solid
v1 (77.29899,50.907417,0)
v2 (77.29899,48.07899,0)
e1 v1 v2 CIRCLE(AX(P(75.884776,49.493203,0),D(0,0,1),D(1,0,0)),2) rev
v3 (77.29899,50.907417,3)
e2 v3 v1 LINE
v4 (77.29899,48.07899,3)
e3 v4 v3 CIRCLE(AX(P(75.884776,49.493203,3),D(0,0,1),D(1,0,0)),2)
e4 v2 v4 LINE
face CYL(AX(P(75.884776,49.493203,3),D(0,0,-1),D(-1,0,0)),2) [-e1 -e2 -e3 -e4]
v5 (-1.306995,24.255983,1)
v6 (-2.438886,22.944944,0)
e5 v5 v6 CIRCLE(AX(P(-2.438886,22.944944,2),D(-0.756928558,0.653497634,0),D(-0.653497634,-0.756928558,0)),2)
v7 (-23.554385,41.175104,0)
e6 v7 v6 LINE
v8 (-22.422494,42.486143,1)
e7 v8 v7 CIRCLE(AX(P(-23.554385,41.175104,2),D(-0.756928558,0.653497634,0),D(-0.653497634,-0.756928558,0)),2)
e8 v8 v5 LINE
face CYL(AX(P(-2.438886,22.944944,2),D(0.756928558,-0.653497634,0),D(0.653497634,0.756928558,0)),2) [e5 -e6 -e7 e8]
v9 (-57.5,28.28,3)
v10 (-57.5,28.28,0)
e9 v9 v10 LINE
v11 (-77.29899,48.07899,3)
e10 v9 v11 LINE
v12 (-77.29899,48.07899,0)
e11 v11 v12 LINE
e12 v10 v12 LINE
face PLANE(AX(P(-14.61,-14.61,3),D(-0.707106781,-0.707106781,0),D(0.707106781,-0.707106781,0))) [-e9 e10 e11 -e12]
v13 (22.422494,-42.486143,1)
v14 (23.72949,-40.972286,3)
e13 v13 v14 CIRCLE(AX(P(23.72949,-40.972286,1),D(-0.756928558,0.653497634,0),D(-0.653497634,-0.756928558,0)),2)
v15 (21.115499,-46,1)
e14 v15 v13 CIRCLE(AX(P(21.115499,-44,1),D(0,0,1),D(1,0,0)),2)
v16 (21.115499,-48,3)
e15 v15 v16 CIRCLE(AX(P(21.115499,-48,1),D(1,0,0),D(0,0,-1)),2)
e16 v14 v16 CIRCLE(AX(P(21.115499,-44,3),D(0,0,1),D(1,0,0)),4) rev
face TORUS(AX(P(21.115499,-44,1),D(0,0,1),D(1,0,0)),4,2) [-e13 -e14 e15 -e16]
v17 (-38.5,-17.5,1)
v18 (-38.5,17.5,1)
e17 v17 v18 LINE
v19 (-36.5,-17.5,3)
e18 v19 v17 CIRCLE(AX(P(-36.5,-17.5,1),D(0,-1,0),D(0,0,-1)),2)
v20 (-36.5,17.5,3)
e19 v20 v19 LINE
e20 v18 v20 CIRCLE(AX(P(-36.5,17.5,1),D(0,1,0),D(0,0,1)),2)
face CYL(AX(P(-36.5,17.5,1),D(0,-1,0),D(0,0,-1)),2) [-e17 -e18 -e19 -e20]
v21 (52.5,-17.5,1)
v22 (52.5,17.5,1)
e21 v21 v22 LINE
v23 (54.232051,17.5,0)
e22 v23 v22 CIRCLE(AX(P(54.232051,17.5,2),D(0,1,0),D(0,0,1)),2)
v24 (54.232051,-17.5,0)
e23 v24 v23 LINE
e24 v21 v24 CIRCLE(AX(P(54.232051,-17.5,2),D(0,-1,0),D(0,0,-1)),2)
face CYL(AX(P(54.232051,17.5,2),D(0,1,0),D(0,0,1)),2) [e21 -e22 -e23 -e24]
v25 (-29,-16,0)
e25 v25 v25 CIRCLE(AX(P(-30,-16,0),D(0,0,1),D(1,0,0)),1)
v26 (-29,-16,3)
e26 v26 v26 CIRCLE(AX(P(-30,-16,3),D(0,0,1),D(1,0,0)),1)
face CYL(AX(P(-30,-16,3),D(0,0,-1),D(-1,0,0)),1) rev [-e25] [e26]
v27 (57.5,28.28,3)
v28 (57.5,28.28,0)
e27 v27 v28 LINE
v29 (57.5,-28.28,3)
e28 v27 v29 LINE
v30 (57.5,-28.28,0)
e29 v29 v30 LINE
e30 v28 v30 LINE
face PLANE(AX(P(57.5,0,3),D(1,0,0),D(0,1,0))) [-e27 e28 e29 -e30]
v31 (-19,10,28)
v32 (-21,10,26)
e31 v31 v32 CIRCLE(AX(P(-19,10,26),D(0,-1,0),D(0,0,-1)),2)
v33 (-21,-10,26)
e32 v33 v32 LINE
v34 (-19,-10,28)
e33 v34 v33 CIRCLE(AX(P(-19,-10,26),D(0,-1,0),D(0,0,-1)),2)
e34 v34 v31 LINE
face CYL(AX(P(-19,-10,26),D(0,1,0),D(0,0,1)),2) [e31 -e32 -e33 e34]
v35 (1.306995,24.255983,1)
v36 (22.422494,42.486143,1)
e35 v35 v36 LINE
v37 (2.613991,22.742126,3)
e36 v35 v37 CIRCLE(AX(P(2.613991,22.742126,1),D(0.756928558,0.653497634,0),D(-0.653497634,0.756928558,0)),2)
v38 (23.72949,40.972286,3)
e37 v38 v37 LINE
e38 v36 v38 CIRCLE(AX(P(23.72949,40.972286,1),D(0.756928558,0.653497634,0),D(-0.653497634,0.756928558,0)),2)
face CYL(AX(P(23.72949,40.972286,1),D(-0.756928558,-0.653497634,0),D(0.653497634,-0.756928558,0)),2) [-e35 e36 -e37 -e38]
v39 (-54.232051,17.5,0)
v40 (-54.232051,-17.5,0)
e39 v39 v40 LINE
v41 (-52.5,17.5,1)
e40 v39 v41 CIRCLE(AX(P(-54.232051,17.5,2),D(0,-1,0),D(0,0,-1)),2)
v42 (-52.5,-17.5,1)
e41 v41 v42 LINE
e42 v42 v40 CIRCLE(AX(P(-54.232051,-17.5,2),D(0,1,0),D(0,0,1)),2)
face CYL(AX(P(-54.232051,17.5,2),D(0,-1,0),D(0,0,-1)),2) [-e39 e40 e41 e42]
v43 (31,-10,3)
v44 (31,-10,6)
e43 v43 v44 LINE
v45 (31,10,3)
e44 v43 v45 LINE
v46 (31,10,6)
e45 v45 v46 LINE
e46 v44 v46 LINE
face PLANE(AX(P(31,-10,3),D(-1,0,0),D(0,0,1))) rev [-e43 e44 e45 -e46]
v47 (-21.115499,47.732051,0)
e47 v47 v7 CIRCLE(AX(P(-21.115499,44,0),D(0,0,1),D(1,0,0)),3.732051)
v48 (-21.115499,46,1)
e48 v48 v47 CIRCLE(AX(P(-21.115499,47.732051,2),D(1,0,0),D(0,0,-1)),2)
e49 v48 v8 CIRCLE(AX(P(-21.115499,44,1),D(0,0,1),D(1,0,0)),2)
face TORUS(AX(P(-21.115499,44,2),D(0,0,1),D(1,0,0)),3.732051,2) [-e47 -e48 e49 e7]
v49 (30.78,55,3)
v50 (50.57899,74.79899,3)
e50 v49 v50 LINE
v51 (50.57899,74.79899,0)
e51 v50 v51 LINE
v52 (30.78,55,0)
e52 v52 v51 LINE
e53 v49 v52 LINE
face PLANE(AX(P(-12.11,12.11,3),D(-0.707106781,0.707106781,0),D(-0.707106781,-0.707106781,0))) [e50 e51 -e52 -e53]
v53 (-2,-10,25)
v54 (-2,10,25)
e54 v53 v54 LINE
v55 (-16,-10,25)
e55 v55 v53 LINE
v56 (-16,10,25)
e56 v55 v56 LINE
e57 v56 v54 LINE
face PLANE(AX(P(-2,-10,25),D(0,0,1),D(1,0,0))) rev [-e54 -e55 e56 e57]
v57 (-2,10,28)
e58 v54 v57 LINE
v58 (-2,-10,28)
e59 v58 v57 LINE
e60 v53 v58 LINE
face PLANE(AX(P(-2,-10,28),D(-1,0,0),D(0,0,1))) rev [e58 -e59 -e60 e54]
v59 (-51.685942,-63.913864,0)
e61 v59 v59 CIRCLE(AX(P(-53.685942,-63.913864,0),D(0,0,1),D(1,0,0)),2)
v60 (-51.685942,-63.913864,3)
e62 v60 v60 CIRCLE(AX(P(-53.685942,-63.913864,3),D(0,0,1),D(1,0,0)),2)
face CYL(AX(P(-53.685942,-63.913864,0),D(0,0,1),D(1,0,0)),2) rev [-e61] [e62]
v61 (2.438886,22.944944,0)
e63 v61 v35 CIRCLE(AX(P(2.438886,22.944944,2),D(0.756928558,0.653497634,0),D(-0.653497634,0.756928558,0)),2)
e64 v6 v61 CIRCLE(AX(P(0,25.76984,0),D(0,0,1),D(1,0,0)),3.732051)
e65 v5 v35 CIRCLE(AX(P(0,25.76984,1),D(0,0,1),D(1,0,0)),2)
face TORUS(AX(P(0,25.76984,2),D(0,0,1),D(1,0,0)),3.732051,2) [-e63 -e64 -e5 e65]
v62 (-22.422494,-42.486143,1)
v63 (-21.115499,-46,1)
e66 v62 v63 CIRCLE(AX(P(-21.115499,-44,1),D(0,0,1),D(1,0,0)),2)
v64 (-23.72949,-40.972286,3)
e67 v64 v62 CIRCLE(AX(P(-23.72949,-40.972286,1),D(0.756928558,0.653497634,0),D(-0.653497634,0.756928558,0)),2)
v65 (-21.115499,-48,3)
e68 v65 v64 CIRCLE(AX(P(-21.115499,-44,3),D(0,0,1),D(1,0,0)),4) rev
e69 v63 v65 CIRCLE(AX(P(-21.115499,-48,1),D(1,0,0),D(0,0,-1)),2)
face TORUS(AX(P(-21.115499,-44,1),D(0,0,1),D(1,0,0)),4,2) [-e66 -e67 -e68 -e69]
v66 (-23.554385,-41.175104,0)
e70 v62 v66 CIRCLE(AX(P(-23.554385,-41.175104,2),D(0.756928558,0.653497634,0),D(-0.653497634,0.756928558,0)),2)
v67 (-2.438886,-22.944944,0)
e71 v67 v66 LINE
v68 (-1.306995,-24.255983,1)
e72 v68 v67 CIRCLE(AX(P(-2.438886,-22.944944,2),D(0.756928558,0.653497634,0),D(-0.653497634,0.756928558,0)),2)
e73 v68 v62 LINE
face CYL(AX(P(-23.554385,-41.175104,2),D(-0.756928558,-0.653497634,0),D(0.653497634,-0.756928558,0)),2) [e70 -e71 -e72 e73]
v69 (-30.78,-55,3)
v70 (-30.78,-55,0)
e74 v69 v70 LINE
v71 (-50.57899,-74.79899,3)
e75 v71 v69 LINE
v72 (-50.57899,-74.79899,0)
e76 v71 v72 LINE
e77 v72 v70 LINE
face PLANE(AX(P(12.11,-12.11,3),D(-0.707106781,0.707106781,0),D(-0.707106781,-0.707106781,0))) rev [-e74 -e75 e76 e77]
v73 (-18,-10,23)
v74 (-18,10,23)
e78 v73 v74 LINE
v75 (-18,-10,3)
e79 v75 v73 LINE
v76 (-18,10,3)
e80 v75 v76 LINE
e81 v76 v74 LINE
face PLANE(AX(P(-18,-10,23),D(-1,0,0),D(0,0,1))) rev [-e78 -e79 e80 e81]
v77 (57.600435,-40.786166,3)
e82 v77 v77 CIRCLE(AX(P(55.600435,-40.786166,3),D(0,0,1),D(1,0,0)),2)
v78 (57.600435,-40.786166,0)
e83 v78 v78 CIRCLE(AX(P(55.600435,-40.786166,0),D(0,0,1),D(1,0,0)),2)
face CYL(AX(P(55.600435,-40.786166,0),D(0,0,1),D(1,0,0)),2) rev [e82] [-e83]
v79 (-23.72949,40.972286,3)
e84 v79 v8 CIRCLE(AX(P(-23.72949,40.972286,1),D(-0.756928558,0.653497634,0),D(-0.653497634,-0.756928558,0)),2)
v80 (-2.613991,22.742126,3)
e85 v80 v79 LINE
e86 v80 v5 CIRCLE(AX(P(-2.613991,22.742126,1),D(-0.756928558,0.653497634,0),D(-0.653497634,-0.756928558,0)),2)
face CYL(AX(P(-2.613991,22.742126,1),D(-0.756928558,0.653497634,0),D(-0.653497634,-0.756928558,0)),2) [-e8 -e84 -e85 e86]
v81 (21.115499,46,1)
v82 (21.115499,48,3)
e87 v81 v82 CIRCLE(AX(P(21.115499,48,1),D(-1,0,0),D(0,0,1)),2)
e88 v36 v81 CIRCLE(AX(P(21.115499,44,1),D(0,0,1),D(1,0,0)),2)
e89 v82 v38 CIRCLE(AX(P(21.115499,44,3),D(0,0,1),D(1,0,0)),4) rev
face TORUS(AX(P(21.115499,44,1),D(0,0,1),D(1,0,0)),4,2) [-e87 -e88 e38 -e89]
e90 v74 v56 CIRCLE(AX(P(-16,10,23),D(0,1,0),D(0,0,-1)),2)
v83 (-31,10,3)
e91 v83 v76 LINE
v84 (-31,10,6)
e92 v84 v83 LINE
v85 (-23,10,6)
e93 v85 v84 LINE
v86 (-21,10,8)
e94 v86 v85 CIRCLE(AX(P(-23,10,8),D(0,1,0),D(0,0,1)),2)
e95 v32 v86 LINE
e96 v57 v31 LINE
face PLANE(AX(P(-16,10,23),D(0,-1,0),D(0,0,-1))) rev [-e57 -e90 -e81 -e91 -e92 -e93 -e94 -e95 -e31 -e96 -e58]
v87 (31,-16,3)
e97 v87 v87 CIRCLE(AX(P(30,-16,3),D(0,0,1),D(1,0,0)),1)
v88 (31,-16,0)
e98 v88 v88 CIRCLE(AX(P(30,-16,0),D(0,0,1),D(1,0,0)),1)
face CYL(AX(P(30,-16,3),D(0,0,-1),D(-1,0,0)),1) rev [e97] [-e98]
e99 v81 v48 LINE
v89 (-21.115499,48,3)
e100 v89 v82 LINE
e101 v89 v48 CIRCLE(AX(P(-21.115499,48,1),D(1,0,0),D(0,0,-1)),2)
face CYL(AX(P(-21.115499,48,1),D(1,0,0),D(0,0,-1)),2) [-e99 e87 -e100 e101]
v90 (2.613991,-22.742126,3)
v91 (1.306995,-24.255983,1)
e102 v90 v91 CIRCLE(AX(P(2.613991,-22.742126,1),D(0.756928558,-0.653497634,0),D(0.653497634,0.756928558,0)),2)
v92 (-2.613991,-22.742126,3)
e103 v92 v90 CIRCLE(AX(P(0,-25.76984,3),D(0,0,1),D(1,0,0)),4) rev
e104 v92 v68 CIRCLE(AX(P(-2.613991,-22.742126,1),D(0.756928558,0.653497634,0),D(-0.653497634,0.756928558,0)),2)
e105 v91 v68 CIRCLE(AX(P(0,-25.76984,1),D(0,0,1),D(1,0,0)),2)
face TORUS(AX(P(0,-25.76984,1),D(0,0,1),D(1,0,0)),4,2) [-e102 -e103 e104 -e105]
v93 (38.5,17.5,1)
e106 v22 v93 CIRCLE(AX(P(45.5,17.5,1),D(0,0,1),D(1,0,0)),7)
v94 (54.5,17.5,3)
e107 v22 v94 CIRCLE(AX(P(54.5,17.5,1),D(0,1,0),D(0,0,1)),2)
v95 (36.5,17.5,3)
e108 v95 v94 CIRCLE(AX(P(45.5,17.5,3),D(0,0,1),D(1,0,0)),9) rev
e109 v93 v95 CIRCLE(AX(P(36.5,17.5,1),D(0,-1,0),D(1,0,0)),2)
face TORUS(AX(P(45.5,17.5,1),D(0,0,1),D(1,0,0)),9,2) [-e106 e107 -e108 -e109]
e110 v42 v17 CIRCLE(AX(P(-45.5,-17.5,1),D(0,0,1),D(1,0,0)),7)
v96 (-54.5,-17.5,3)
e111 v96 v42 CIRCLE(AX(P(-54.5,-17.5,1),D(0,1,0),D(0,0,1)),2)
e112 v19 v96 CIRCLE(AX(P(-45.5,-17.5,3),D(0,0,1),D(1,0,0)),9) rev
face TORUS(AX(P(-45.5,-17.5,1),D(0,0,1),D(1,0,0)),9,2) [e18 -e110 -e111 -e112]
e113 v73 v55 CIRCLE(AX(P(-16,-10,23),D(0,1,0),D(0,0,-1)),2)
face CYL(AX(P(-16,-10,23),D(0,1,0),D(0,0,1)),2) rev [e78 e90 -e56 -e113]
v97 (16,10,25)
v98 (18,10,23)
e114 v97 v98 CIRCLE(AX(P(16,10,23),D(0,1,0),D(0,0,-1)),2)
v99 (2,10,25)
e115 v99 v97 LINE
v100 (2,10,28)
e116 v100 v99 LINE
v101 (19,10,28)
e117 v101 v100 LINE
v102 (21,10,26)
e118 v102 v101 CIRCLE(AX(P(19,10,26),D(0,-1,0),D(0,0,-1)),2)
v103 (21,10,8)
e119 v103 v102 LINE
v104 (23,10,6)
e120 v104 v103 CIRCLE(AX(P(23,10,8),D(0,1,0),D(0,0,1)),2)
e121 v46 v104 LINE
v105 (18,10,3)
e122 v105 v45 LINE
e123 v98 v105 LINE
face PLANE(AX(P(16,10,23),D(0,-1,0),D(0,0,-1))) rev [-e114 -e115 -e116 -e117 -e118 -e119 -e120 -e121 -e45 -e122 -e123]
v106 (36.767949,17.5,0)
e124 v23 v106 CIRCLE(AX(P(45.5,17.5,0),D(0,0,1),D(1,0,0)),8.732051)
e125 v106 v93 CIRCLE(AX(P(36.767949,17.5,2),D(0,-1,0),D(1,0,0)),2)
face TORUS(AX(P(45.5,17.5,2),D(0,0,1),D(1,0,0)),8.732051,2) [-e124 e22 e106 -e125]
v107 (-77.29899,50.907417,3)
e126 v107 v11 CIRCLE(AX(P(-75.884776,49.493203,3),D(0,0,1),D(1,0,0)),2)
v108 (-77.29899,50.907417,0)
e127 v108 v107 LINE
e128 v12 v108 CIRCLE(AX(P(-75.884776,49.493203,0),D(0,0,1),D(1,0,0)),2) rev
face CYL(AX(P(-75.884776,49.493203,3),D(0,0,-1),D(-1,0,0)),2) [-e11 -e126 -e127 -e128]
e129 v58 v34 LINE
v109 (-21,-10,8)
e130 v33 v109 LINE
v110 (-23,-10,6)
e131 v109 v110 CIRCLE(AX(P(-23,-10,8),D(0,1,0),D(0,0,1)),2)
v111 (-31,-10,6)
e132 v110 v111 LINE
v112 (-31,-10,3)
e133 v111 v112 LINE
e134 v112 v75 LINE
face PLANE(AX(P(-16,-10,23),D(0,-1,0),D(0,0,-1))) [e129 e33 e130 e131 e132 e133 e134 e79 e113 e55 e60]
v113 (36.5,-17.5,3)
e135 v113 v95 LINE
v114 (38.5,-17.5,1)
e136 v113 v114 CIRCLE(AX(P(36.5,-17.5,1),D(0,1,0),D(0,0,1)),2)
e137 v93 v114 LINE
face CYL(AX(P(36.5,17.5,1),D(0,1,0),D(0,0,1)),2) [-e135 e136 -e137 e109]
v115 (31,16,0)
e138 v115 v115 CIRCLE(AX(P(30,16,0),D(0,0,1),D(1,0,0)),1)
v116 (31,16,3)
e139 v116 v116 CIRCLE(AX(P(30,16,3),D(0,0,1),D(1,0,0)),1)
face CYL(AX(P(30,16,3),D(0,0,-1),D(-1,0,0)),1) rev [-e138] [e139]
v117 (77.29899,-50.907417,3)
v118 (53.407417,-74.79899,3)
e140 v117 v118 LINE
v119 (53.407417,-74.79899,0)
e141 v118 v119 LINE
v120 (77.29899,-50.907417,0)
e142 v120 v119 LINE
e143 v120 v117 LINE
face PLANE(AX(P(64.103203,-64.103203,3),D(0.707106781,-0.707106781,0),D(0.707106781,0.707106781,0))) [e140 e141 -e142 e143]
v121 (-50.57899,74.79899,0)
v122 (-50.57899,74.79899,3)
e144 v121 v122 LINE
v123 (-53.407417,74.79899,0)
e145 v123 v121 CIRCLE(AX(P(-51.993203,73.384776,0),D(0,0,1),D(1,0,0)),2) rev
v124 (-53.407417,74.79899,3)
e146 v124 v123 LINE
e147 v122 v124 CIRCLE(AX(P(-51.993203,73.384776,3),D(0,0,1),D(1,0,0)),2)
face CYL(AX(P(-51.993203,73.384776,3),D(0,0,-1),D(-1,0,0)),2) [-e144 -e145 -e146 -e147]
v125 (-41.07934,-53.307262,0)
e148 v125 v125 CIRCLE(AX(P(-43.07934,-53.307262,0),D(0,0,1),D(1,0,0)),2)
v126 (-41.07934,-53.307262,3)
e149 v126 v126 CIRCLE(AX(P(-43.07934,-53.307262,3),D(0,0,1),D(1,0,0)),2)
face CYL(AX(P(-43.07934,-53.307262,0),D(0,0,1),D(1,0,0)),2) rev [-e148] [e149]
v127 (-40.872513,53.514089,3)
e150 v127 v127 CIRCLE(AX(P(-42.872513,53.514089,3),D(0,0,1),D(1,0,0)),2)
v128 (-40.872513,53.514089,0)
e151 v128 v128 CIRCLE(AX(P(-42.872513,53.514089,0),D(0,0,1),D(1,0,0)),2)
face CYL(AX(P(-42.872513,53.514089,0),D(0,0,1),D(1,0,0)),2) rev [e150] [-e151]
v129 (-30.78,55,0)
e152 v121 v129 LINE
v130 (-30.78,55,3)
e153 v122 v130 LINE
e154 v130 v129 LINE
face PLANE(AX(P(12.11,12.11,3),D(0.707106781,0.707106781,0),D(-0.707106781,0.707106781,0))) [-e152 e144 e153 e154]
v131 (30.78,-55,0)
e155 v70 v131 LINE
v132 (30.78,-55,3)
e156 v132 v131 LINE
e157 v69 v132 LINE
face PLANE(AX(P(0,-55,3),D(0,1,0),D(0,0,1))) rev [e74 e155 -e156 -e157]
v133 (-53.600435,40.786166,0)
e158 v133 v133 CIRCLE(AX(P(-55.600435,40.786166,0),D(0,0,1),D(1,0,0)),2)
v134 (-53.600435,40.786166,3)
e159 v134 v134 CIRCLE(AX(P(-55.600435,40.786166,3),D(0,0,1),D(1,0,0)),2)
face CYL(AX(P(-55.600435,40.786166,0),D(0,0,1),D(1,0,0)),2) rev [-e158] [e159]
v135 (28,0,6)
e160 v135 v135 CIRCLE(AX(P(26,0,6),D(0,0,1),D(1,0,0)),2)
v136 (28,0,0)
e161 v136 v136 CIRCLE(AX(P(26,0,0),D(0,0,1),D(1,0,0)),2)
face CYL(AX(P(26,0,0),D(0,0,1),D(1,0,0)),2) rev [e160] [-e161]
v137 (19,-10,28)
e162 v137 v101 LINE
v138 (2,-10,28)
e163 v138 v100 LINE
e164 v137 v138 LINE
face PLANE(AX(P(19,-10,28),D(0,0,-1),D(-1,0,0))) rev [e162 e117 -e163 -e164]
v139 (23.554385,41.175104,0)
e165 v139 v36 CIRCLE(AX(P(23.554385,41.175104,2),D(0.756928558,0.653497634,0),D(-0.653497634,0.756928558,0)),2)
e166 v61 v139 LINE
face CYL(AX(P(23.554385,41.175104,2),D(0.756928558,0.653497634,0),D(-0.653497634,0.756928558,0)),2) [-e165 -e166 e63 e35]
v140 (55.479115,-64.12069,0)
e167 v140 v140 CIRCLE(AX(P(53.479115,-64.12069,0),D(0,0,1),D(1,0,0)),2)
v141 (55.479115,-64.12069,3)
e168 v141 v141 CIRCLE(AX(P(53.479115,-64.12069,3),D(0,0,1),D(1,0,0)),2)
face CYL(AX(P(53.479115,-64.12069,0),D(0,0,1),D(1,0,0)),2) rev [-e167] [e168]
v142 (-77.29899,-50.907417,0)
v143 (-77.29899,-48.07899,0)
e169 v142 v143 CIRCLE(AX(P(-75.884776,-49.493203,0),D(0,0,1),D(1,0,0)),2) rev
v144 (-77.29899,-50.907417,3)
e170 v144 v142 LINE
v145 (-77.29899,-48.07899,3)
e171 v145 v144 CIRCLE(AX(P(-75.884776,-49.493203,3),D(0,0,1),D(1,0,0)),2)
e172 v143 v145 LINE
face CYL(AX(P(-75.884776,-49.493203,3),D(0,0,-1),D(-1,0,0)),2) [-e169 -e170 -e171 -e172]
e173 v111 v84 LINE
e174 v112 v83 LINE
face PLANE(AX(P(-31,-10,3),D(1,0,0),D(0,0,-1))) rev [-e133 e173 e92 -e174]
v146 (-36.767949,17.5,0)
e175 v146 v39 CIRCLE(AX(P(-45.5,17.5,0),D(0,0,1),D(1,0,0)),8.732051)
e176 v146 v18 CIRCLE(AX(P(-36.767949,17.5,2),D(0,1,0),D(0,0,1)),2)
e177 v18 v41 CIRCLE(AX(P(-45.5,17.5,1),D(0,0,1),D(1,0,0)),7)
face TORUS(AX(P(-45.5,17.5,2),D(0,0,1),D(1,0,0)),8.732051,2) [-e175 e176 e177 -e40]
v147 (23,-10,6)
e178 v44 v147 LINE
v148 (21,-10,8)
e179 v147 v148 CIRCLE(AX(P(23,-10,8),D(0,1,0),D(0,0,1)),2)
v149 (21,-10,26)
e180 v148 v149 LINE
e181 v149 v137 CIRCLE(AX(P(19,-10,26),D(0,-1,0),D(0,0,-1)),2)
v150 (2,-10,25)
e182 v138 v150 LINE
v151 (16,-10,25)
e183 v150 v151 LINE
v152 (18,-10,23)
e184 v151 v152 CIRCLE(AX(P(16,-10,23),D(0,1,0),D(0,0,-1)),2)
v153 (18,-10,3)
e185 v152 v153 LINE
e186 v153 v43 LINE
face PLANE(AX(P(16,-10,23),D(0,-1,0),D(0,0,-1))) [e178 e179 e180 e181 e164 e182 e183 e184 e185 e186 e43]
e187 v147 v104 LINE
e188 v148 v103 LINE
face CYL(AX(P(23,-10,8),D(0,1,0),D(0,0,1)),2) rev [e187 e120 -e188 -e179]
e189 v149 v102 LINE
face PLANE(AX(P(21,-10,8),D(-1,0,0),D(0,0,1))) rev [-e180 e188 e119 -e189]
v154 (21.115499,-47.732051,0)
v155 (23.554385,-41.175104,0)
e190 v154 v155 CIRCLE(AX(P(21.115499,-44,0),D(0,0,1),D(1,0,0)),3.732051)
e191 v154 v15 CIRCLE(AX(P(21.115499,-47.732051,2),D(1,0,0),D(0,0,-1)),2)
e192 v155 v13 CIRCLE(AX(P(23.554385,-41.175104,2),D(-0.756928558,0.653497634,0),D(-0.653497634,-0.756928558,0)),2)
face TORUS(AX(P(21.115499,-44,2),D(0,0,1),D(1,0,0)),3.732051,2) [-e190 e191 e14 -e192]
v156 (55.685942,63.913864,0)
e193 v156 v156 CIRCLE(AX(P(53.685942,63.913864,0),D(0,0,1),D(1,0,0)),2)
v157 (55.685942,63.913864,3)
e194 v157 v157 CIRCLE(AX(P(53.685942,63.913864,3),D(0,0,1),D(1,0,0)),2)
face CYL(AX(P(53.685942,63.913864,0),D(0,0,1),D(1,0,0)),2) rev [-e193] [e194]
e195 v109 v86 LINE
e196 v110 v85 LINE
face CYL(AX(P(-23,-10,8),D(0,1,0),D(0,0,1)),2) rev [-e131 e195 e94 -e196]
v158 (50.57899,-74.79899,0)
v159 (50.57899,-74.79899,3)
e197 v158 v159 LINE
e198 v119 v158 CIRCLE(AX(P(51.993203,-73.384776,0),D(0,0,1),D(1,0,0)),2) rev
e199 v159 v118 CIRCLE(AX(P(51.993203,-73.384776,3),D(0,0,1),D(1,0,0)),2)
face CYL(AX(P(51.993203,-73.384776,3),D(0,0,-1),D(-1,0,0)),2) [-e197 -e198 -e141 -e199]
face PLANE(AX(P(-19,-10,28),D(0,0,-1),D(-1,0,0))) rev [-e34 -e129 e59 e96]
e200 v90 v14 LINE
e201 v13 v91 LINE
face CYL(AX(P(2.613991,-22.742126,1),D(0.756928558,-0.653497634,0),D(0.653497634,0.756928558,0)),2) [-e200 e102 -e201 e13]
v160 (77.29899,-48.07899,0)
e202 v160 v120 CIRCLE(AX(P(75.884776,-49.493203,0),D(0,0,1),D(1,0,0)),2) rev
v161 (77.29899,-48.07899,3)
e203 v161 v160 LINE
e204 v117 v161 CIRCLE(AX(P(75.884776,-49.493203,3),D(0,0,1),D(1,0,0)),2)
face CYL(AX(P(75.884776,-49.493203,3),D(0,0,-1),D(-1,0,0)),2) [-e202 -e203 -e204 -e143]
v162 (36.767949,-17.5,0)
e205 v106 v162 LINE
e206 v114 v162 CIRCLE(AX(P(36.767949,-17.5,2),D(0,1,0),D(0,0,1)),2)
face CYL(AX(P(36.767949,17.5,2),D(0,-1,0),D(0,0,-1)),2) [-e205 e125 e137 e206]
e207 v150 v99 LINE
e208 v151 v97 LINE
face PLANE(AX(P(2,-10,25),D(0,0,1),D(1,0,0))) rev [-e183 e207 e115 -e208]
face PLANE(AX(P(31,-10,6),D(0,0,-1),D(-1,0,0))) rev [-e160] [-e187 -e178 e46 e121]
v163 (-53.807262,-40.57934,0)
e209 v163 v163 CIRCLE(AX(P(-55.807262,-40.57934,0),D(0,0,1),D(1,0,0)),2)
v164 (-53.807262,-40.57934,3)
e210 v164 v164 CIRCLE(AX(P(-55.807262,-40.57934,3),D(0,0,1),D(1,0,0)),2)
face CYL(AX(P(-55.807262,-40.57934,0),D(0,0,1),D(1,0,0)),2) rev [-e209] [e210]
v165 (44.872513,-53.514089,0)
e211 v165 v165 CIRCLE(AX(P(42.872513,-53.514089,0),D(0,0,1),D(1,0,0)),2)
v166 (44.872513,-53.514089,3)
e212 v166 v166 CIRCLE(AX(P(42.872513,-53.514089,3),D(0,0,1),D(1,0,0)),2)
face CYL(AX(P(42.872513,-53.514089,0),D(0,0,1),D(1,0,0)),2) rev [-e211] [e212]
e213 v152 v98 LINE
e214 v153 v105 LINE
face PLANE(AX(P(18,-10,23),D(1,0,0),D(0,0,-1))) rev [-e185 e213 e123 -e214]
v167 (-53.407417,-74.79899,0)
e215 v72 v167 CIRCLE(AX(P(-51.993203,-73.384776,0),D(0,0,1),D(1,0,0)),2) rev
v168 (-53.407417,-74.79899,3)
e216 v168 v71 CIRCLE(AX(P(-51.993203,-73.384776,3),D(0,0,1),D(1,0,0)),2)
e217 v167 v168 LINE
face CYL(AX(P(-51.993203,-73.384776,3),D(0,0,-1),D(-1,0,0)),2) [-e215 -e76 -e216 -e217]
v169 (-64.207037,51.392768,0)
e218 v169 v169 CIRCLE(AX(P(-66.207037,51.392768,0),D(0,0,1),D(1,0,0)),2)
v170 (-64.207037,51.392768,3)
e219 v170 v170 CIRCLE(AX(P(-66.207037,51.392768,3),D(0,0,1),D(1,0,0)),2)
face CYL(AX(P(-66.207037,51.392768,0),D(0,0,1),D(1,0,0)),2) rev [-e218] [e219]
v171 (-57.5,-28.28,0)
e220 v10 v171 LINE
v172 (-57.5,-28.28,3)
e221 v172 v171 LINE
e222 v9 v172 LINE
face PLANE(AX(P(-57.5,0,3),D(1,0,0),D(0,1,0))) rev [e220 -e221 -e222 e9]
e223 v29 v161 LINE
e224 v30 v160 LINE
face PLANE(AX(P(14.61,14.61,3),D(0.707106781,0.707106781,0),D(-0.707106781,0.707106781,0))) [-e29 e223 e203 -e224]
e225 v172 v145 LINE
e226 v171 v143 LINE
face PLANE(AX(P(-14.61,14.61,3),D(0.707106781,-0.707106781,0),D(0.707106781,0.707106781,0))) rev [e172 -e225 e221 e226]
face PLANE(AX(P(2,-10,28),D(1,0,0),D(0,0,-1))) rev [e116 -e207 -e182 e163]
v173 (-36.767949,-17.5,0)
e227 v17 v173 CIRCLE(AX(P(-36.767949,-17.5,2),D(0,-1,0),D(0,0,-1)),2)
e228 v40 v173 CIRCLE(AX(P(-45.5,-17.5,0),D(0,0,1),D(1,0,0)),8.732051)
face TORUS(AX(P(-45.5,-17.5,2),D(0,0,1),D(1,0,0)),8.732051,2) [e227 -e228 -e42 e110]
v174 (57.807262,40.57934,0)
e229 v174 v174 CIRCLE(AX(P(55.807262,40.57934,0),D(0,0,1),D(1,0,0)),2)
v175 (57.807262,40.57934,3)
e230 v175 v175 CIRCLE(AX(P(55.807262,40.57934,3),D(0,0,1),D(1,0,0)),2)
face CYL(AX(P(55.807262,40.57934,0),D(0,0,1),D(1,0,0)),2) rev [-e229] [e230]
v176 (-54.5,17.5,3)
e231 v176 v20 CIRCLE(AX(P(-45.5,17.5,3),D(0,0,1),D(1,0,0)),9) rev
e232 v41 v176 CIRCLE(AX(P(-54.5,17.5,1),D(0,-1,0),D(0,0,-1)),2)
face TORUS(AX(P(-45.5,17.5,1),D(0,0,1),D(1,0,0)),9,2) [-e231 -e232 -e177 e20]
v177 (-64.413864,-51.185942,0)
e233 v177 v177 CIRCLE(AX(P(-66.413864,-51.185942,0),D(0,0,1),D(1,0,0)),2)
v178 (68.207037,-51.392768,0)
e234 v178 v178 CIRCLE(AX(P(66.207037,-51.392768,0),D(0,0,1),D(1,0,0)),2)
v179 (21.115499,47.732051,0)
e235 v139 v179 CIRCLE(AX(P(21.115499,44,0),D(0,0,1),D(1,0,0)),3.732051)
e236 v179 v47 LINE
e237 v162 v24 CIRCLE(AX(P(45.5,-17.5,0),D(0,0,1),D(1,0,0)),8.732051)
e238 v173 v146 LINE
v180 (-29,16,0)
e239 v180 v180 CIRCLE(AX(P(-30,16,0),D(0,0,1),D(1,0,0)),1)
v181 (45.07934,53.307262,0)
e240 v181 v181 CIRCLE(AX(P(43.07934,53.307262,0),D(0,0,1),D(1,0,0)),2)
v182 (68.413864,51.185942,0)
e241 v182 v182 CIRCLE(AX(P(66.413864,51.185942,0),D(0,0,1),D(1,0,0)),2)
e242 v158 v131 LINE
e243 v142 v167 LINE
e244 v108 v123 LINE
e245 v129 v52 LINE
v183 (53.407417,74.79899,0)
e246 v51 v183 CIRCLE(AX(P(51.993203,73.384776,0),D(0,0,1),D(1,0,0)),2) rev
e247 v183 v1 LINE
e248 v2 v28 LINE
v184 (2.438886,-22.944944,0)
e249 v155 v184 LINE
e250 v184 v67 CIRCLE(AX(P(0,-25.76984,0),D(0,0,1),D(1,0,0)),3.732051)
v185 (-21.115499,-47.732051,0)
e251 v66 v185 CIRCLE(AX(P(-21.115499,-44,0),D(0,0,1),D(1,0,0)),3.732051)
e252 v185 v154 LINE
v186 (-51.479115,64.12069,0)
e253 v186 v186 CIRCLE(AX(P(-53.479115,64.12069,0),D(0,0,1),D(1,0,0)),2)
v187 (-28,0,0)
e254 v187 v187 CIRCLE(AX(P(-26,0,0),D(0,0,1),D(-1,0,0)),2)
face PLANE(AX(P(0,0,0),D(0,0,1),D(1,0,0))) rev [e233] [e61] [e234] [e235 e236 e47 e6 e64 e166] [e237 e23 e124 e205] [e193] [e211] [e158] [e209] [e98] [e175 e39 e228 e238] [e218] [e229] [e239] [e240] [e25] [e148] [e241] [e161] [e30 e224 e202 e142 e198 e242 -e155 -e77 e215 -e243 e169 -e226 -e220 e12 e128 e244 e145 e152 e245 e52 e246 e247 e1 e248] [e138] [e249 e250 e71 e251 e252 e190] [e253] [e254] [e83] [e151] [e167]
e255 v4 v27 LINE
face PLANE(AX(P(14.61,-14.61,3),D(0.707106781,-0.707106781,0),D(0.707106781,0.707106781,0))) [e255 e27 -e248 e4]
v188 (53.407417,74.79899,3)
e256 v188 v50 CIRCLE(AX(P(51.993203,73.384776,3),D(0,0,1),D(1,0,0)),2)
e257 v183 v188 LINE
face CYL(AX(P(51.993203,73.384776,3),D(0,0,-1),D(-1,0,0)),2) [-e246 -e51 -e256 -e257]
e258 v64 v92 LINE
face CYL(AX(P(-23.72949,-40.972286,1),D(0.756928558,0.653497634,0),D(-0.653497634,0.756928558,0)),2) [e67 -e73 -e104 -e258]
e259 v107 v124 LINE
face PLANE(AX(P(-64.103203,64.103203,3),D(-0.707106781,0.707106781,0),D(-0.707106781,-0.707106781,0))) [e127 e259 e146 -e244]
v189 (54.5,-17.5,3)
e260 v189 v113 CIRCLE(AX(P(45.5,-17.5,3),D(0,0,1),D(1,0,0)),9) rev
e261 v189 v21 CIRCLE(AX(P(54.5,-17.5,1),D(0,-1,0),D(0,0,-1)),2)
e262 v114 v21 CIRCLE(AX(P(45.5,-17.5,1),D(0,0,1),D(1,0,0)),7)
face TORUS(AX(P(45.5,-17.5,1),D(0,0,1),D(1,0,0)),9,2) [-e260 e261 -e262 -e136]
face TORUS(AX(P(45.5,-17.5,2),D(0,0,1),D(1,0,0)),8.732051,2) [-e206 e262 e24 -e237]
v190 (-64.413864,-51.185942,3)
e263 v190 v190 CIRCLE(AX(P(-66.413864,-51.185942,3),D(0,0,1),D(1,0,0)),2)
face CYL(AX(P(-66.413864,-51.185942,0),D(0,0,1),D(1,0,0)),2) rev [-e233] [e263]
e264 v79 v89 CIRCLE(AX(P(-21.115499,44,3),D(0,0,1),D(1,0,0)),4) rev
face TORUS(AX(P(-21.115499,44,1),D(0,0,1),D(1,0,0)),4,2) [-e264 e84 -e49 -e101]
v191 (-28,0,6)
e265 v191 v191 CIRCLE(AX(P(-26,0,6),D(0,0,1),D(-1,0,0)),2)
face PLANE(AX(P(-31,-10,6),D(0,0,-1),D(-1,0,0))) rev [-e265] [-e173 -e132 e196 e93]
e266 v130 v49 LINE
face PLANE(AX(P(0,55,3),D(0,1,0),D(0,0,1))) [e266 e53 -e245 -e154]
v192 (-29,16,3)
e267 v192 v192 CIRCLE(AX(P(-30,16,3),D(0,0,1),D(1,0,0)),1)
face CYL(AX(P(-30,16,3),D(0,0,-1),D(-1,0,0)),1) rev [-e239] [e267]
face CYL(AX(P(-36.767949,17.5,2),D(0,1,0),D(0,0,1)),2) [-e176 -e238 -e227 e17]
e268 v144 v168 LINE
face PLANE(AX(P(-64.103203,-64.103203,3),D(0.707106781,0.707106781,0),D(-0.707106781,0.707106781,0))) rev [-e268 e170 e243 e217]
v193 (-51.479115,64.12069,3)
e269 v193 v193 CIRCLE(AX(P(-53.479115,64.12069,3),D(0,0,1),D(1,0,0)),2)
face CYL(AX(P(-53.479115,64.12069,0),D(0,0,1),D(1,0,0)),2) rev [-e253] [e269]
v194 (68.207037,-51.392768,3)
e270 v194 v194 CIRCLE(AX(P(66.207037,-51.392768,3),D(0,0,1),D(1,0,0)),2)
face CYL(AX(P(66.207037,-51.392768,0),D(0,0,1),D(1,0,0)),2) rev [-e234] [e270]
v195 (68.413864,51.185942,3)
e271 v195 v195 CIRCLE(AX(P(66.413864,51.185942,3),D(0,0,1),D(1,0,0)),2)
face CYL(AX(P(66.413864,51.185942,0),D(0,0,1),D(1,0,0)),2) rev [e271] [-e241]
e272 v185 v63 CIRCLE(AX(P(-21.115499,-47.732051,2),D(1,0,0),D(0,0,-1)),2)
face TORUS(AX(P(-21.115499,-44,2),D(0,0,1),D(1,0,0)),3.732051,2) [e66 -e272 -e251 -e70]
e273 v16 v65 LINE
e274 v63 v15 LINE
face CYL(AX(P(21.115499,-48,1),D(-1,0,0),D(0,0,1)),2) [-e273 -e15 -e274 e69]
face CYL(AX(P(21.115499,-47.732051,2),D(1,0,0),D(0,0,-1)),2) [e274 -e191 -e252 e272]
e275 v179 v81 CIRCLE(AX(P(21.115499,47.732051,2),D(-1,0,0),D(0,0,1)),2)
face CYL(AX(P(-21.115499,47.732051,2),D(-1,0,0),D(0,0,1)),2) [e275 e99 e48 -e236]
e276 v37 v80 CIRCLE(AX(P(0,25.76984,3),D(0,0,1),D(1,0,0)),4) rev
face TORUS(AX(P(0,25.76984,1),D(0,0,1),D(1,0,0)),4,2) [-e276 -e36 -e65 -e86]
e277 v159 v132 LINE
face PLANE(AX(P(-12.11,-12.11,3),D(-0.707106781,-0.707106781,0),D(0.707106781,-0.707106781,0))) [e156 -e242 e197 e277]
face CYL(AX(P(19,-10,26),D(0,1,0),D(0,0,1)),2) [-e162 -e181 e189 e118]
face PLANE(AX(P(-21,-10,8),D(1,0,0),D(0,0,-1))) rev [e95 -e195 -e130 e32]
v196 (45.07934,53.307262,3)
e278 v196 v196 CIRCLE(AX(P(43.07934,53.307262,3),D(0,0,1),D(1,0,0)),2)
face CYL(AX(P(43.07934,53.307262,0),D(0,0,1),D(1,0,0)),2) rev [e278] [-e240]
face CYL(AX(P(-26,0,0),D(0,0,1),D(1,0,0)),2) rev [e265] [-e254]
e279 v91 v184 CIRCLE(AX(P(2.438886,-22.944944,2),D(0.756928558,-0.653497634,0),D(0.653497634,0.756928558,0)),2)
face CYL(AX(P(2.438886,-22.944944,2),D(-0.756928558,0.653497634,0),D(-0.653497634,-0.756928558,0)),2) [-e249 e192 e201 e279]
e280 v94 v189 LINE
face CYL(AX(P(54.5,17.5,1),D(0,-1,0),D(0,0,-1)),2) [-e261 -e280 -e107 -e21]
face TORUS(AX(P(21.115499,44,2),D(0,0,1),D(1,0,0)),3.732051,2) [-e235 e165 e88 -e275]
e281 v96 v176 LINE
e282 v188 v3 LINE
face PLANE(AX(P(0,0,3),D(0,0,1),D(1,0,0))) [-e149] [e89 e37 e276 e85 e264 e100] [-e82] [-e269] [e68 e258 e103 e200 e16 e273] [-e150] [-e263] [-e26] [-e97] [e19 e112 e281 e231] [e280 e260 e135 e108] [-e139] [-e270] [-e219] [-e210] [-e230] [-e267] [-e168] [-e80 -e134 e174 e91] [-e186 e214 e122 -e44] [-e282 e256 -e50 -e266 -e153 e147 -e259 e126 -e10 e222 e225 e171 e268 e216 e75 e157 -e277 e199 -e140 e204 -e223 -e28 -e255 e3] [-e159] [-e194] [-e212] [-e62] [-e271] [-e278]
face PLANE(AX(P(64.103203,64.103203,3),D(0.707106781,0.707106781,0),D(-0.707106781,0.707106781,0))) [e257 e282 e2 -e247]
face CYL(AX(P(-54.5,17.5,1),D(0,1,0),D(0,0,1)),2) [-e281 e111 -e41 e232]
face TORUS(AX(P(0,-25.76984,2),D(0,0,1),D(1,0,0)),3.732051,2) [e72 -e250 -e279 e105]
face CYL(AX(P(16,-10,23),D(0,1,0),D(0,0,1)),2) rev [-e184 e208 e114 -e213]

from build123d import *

# Parameters (mm, degrees)
SKETCH1_R           = 1
BOSS_EXTRUDE1_DEPTH = 3
SKETCH2_R           = 2
CUT_EXTRUDE1_DEPTH  = 110.604839186
FILLET1_R           = 2
FILLET2_R           = 2
FILLET3_R           = 2
BOSS_EXTRUDE2_DEPTH = 10
SKETCH4_R           = 2
CUT_EXTRUDE2_DEPTH  = 111.602454224


with BuildPart() as part:
    # Sketch1 → Boss-Extrude1 (new body)
    with BuildSketch(Plane.XY):
        Polygon((78.713203436, 49.493203436), (57.5, 28.28), (57.5, -28.28), (78.713203436, -49.493203436), (51.993203436, -76.213203436), (30.78, -55), (-30.78, -55), (-51.993203436, -76.213203436), (-78.713203436, -49.493203436), (-57.5, -28.28), (-57.5, 28.28), (-78.713203436, 49.493203436), (-51.993203436, 76.213203436), (-30.78, 55), (30.78, 55), (51.993203436, 76.213203436), align=None)
        with Locations((30, -16)):
            Circle(SKETCH1_R, mode=Mode.SUBTRACT)
        with Locations((30, 16)):
            Circle(SKETCH1_R, mode=Mode.SUBTRACT)
        with Locations((-30, -16)):
            Circle(SKETCH1_R, mode=Mode.SUBTRACT)
        with Locations((-30, 16)):
            Circle(SKETCH1_R, mode=Mode.SUBTRACT)
    extrude(amount=BOSS_EXTRUDE1_DEPTH)

    # Sketch2 → Cut-Extrude1 (cut, through all)
    with BuildSketch(Plane.XY.offset(3)):
        with Locations((43.079339828, 53.30726189)):
            Circle(SKETCH2_R)
        with Locations((53.685941546, 63.913863607)):
            Circle(SKETCH2_R)
        with Locations((55.80726189, 40.579339828)):
            Circle(SKETCH2_R)
        with Locations((66.413863607, 51.185941546)):
            Circle(SKETCH2_R)
        with Locations((-66.413863607, -51.185941546)):
            Circle(SKETCH2_R)
        with Locations((-55.80726189, -40.579339828)):
            Circle(SKETCH2_R)
        with Locations((-43.079339828, -53.30726189)):
            Circle(SKETCH2_R)
        with Locations((-53.685941546, -63.913863607)):
            Circle(SKETCH2_R)
        with Locations((-53.479114875, 64.120690278)):
            Circle(SKETCH2_R)
        with Locations((-42.872513158, 53.51408856)):
            Circle(SKETCH2_R)
        with Locations((-55.600435219, 40.786166499)):
            Circle(SKETCH2_R)
        with Locations((-66.207036937, 51.392768217)):
            Circle(SKETCH2_R)
        with Locations((55.600435219, -40.786166499)):
            Circle(SKETCH2_R)
        with Locations((42.872513157, -53.51408856)):
            Circle(SKETCH2_R)
        with Locations((66.207036937, -51.392768217)):
            Circle(SKETCH2_R)
        with Locations((53.479114875, -64.120690278)):
            Circle(SKETCH2_R)
        with BuildLine():
            Line((-21.115499019, 46), (21.115499019, 46))
            ThreePointArc((21.115499019, 46), (22.990027524, 44.697239474), (22.422494287, 42.486142884))
            Line((22.422494287, 42.486142884), (1.306995268, 24.255982976))
            ThreePointArc((1.306995268, 24.255982976), (0, 23.769840093), (-1.306995268, 24.255982976))
            Line((-1.306995268, 24.255982976), (-22.422494287, 42.486142884))
            ThreePointArc((-22.422494287, 42.486142884), (-22.990027524, 44.697239474), (-21.115499019, 46))
        make_face()
        with BuildLine():
            Line((21.115499019, -46), (-21.115499019, -46))
            ThreePointArc((-21.115499019, -46), (-22.990027524, -44.697239474), (-22.422494287, -42.486142884))
            Line((-22.422494287, -42.486142884), (-1.306995268, -24.255982976))
            ThreePointArc((-1.306995268, -24.255982976), (0, -23.769840093), (1.306995268, -24.255982976))
            Line((1.306995268, -24.255982976), (22.422494287, -42.486142884))
            ThreePointArc((22.422494287, -42.486142884), (22.990027524, -44.697239474), (21.115499019, -46))
        make_face()
        with BuildLine():
            Line((-38.5, 17.5), (-38.5, -17.5))
            ThreePointArc((-38.5, -17.5), (-45.5, -24.5), (-52.5, -17.5))
            Line((-52.5, -17.5), (-52.5, 17.5))
            ThreePointArc((-52.5, 17.5), (-45.5, 24.5), (-38.5, 17.5))
        make_face()
        with BuildLine():
            Line((38.5, 17.5), (38.5, -17.5))
            ThreePointArc((38.5, -17.5), (45.5, -24.5), (52.5, -17.5))
            Line((52.5, -17.5), (52.5, 17.5))
            ThreePointArc((52.5, 17.5), (45.5, 24.5), (38.5, 17.5))
        make_face()
    extrude(amount=-CUT_EXTRUDE1_DEPTH, mode=Mode.SUBTRACT)

    # Fillet1
    fillet1_edges = [part.edges().sort_by_distance(p)[0] for p in [
        (78.713203436, -49.493203436, 1.5),
        (51.993203436, -76.213203436, 1.5),
        (-51.993203436, -76.213203436, 1.5),
        (-78.713203436, -49.493203436, 1.5),
        (-78.713203436, 49.493203436, 1.5),
        (-51.993203436, 76.213203436, 1.5),
        (51.993203436, 76.213203436, 1.5),
        (78.713203436, 49.493203436, 1.5),
    ]]
    fillet(fillet1_edges, radius=FILLET1_R)

    # Fillet2
    fillet2_edges = [part.edges().sort_by_distance(p)[0] for p in [
        (0, 23.769840093, 3),
        (11.864744778, 33.37106293, 3),
        (22.990027524, 44.697239474, 3),
        (0, 46, 3),
        (-22.990027524, 44.697239474, 3),
        (-11.864744778, 33.37106293, 3),
        (-45.5, 24.5, 3),
        (-52.5, 0, 3),
        (-45.5, -24.5, 3),
        (-38.5, 0, 3),
        (0, -23.769840093, 3),
        (-11.864744778, -33.37106293, 3),
        (-22.990027524, -44.697239474, 3),
        (0, -46, 3),
        (22.990027524, -44.697239474, 3),
        (11.864744778, -33.37106293, 3),
        (45.5, 24.5, 3),
        (38.5, 0, 3),
        (45.5, -24.5, 3),
        (52.5, 0, 3),
    ]]
    fillet(fillet2_edges, radius=FILLET2_R)

    # Fillet3
    # the kernel refuses this fillet: 2 mm, written as the material it takes off along each edge
    with BuildSketch(Plane(origin=(21.115499019, 46, 0), x_dir=(0, 0, 1), z_dir=(-1, 0, 0))) as fillet3_piece_1:
        with BuildLine():
            CenterArc((2, 1.732050808), FILLET3_R, 180, 60)
            Line((0, 1.732050808), (-0.04, 1.732050808))
            Line((-0.04, 1.732050808), (-0.04, 0))
            Line((-0.04, 0), (0, -0.04))
            ThreePointArc((0, -0.04), (0.5, -0.04), (0.98, -0.034641016))
            Line((0.98, -0.034641016), (1, 0))
        make_face()
    extrude(amount=42.230998037, mode=Mode.SUBTRACT)
    with BuildSketch(Plane(origin=(21.115499019, 44, 0), x_dir=(0.6534976341785956, -0.7569285581367495, 0), z_dir=(-0.7569285581367495, -0.6534976341785956, 0))) as fillet3_piece_2:
        with BuildLine():
            CenterArc((3.732050808, 2), FILLET3_R, 210, 60)
            Line((3.732050808, 0), (3.732050808, -0.04))
            Line((3.732050808, -0.04), (2, -0.04))
            Line((2, -0.04), (1.96, 0))
            ThreePointArc((1.96, 0), (1.96, 0.5), (1.965358984, 0.98))
            Line((1.965358984, 0.98), (2, 1))
        make_face()
    revolve(axis=Axis((21.115499019, 44, 0), (0, 0, 1)), revolution_arc=139.194169449, mode=Mode.SUBTRACT)
    with BuildSketch(Plane(origin=(1.306995268, 24.255982976, 0), x_dir=(0, 0, 1), z_dir=(0.7569285581367493, 0.6534976341785957, 0)), Plane(origin=(-22.422494287, 42.486142884, 0), x_dir=(0, 0, 1), z_dir=(0.7569285581367498, -0.6534976341785953, 0))) as fillet3_piece_3:
        with BuildLine():
            CenterArc((2, 1.732050808), FILLET3_R, 180, 60)
            Line((0, 1.732050808), (-0.04, 1.732050808))
            Line((-0.04, 1.732050808), (-0.04, 0))
            Line((-0.04, 0), (0, -0.04))
            ThreePointArc((0, -0.04), (0.5, -0.04), (0.98, -0.034641016))
            Line((0.98, -0.034641016), (1, 0))
        make_face()
    extrude(amount=27.896290597, mode=Mode.SUBTRACT)
    with BuildSketch(Plane(origin=(0, 25.769840093, 0), x_dir=(-0.653497634178595, -0.75692855813675, 0), z_dir=(-0.75692855813675, 0.653497634178595, 0))) as fillet3_piece_4:
        with BuildLine():
            CenterArc((3.732050808, 2), FILLET3_R, 210, 60)
            Line((3.732050808, 0), (3.732050808, -0.04))
            Line((3.732050808, -0.04), (2, -0.04))
            Line((2, -0.04), (1.96, 0))
            ThreePointArc((1.96, 0), (1.96, 0.5), (1.965358984, 0.98))
            Line((1.965358984, 0.98), (2, 1))
        make_face()
    revolve(axis=Axis((0, 25.769840093, 0), (0, 0, 1)), revolution_arc=81.611661103, mode=Mode.SUBTRACT)
    with BuildSketch(Plane(origin=(-52.5, 17.5, 0), x_dir=(-1, 0, 0), z_dir=(0, -1, 0)), Plane(origin=(-38.5, -17.5, 0), x_dir=(1, 0, 0), z_dir=(0, 1, 0))) as fillet3_piece_5:
        with BuildLine():
            CenterArc((1.732050808, -2), FILLET3_R, 90, 60)
            Line((0, -1), (-0.034641016, -0.98))
            ThreePointArc((-0.034641016, -0.98), (-0.04, -0.5), (-0.04, 0))
            Line((-0.04, 0), (0, 0.04))
            Line((0, 0.04), (1.732050808, 0.04))
            Line((1.732050808, 0.04), (1.732050808, 0))
        make_face()
    extrude(amount=35, mode=Mode.SUBTRACT)
    with BuildSketch(Plane(origin=(-45.5, 17.5, 0), x_dir=(1, 0, 0), z_dir=(0, -1, 0))) as fillet3_piece_6:
        with BuildLine():
            CenterArc((8.732050808, 2), FILLET3_R, 210, 60)
            Line((7, 1), (6.965358984, 0.98))
            ThreePointArc((6.965358984, 0.98), (6.96, 0.5), (6.96, 0))
            Line((6.96, 0), (7, -0.04))
            Line((7, -0.04), (8.732050808, -0.04))
            Line((8.732050808, -0.04), (8.732050808, 0))
        make_face()
    revolve(axis=Axis((-45.5, 17.5, 0), (0, 0, 1)), revolution_arc=180, mode=Mode.SUBTRACT)
    with BuildSketch(Plane(origin=(38.5, -17.5, 0), x_dir=(-1, 0, 0), z_dir=(0, 1, 0)), Plane(origin=(52.5, 17.5, 0), x_dir=(1, 0, 0), z_dir=(0, -1, 0))) as fillet3_piece_7:
        with BuildLine():
            CenterArc((1.732050808, 2), FILLET3_R, 210, 60)
            Line((0, 1), (-0.034641016, 0.98))
            ThreePointArc((-0.034641016, 0.98), (-0.04, 0.5), (-0.04, 0))
            Line((-0.04, 0), (0, -0.04))
            Line((0, -0.04), (1.732050808, -0.04))
            Line((1.732050808, -0.04), (1.732050808, 0))
        make_face()
    extrude(amount=35, mode=Mode.SUBTRACT)
    with BuildSketch(Plane(origin=(45.5, 17.5, 0), x_dir=(1, 0, 0), z_dir=(0, -1, 0))) as fillet3_piece_8:
        with BuildLine():
            CenterArc((8.732050808, 2), FILLET3_R, 210, 60)
            Line((7, 1), (6.965358984, 0.98))
            ThreePointArc((6.965358984, 0.98), (6.96, 0.5), (6.96, 0))
            Line((6.96, 0), (7, -0.04))
            Line((7, -0.04), (8.732050808, -0.04))
            Line((8.732050808, -0.04), (8.732050808, 0))
        make_face()
    revolve(axis=Axis((45.5, 17.5, 0), (0, 0, 1)), revolution_arc=180, mode=Mode.SUBTRACT)
    with BuildSketch(Plane(origin=(22.422494287, -42.486142884, 0), x_dir=(0.6534976341785951, 0.7569285581367498, 0), z_dir=(-0.7569285581367499, 0.6534976341785952, 0)), Plane(origin=(-1.306995268, -24.255982976, 0), x_dir=(-0.653497634178596, 0.7569285581367492, 0), z_dir=(-0.7569285581367492, -0.653497634178596, 0))) as fillet3_piece_9:
        with BuildLine():
            CenterArc((1.732050808, -2), FILLET3_R, 90, 60)
            Line((0, -1), (-0.034641016, -0.98))
            ThreePointArc((-0.034641016, -0.98), (-0.04, -0.5), (-0.04, 0))
            Line((-0.04, 0), (0, 0.04))
            Line((0, 0.04), (1.732050808, 0.04))
            Line((1.732050808, 0.04), (1.732050808, 0))
        make_face()
    extrude(amount=27.896290597, mode=Mode.SUBTRACT)
    with BuildSketch(Plane(origin=(21.115499019, -44, 0), x_dir=(0, -1, 0), z_dir=(-1, 0, 0))) as fillet3_piece_10:
        with BuildLine():
            CenterArc((3.732050808, 2), FILLET3_R, 210, 60)
            Line((2, 1), (1.965358984, 0.98))
            ThreePointArc((1.965358984, 0.98), (1.96, 0.5), (1.96, 0))
            Line((1.96, 0), (2, -0.04))
            Line((2, -0.04), (3.732050808, -0.04))
            Line((3.732050808, -0.04), (3.732050808, 0))
        make_face()
    revolve(axis=Axis((21.115499019, -44, 0), (0, 0, 1)), revolution_arc=139.194169449, mode=Mode.SUBTRACT)
    with BuildSketch(Plane(origin=(-21.115499019, -46, 0), x_dir=(0, -1, 0), z_dir=(1, 0, 0))) as fillet3_piece_11:
        with BuildLine():
            CenterArc((1.732050808, -2), FILLET3_R, 90, 60)
            Line((0, -1), (-0.034641016, -0.98))
            ThreePointArc((-0.034641016, -0.98), (-0.04, -0.5), (-0.04, 0))
            Line((-0.04, 0), (0, 0.04))
            Line((0, 0.04), (1.732050808, 0.04))
            Line((1.732050808, 0.04), (1.732050808, 0))
        make_face()
    extrude(amount=42.230998037, mode=Mode.SUBTRACT)
    with BuildSketch(Plane(origin=(-21.115499019, -44, 0), x_dir=(-0.6534976341785966, 0.7569285581367486, 0), z_dir=(0.7569285581367486, 0.6534976341785966, 0))) as fillet3_piece_12:
        with BuildLine():
            CenterArc((3.732050808, 2), FILLET3_R, 210, 60)
            Line((2, 1), (1.965358984, 0.98))
            ThreePointArc((1.965358984, 0.98), (1.96, 0.5), (1.96, 0))
            Line((1.96, 0), (2, -0.04))
            Line((2, -0.04), (3.732050808, -0.04))
            Line((3.732050808, -0.04), (3.732050808, 0))
        make_face()
    revolve(axis=Axis((-21.115499019, -44, 0), (0, 0, 1)), revolution_arc=139.194169449, mode=Mode.SUBTRACT)
    with BuildSketch(Plane(origin=(-21.115499019, 44, 0), x_dir=(0, 1, 0), z_dir=(1, 0, 0))) as fillet3_piece_13:
        with BuildLine():
            CenterArc((3.732050808, 2), FILLET3_R, 210, 60)
            Line((3.732050808, 0), (3.732050808, -0.04))
            Line((3.732050808, -0.04), (2, -0.04))
            Line((2, -0.04), (1.96, 0))
            ThreePointArc((1.96, 0), (1.96, 0.5), (1.965358984, 0.98))
            Line((1.965358984, 0.98), (2, 1))
        make_face()
    revolve(axis=Axis((-21.115499019, 44, 0), (0, 0, 1)), revolution_arc=139.194169449, mode=Mode.SUBTRACT)
    with BuildSketch(Plane(origin=(-45.5, -17.5, 0), x_dir=(-1, 0, 0), z_dir=(0, 1, 0))) as fillet3_piece_14:
        with BuildLine():
            CenterArc((8.732050808, 2), FILLET3_R, 210, 60)
            Line((7, 1), (6.965358984, 0.98))
            ThreePointArc((6.965358984, 0.98), (6.96, 0.5), (6.96, 0))
            Line((6.96, 0), (7, -0.04))
            Line((7, -0.04), (8.732050808, -0.04))
            Line((8.732050808, -0.04), (8.732050808, 0))
        make_face()
    revolve(axis=Axis((-45.5, -17.5, 0), (0, 0, 1)), revolution_arc=180, mode=Mode.SUBTRACT)
    with BuildSketch(Plane(origin=(45.5, -17.5, 0), x_dir=(-1, 0, 0), z_dir=(0, 1, 0))) as fillet3_piece_15:
        with BuildLine():
            CenterArc((8.732050808, 2), FILLET3_R, 210, 60)
            Line((7, 1), (6.965358984, 0.98))
            ThreePointArc((6.965358984, 0.98), (6.96, 0.5), (6.96, 0))
            Line((6.96, 0), (7, -0.04))
            Line((7, -0.04), (8.732050808, -0.04))
            Line((8.732050808, -0.04), (8.732050808, 0))
        make_face()
    revolve(axis=Axis((45.5, -17.5, 0), (0, 0, 1)), revolution_arc=180, mode=Mode.SUBTRACT)
    with BuildSketch(Plane(origin=(0, -25.769840093, 0), x_dir=(0.6534976341785979, 0.7569285581367475, 0), z_dir=(0.7569285581367475, -0.6534976341785979, 0))) as fillet3_piece_16:
        with BuildLine():
            CenterArc((3.732050808, 2), FILLET3_R, 210, 60)
            Line((2, 1), (1.965358984, 0.98))
            ThreePointArc((1.965358984, 0.98), (1.96, 0.5), (1.96, 0))
            Line((1.96, 0), (2, -0.04))
            Line((2, -0.04), (3.732050808, -0.04))
            Line((3.732050808, -0.04), (3.732050808, 0))
        make_face()
    revolve(axis=Axis((0, -25.769840093, 0), (0, 0, 1)), revolution_arc=81.611661103, mode=Mode.SUBTRACT)

    # Sketch3 → Boss-Extrude2 (add, symmetric)
    with BuildSketch(Plane(origin=(0, 0, 0), x_dir=(-1, 0, 0), z_dir=(0, -1, 0))):
        with BuildLine():
            Line((-21, -8), (-21, -26))
            ThreePointArc((-21, -26), (-20.414213562, -27.414213562), (-19, -28))
            Line((-19, -28), (-2, -28))
            Line((-2, -28), (-2, -25))
            Line((-2, -25), (-16, -25))
            ThreePointArc((-16, -25), (-17.414213562, -24.414213562), (-18, -23))
            Line((-18, -23), (-18, -3))
            Line((-18, -3), (-31, -3))
            Line((-31, -3), (-31, -6))
            Line((-31, -6), (-23, -6))
            ThreePointArc((-23, -6), (-21.585786438, -6.585786438), (-21, -8))
        make_face()
        with BuildLine():
            Line((2, -28), (2, -25))
            Line((2, -25), (16, -25))
            ThreePointArc((16, -25), (17.414213562, -24.414213562), (18, -23))
            Line((18, -23), (18, -3))
            Line((18, -3), (31, -3))
            Line((31, -3), (31, -6))
            Line((31, -6), (23, -6))
            ThreePointArc((23, -6), (21.585786438, -6.585786438), (21, -8))
            Line((21, -8), (21, -26))
            ThreePointArc((21, -26), (20.414213562, -27.414213562), (19, -28))
            Line((19, -28), (2, -28))
        make_face()
    extrude(amount=BOSS_EXTRUDE2_DEPTH, both=True)

    # Sketch4 → Cut-Extrude2 (cut, through all)
    with BuildSketch(Plane.XY.offset(6)):
        with Locations((26, 0)):
            Circle(SKETCH4_R)
        with Locations(Location((-26, 0, 0), (0, 0, 180))):
            Circle(SKETCH4_R)
    extrude(amount=-CUT_EXTRUDE2_DEPTH, mode=Mode.SUBTRACT)


solid = part.part
